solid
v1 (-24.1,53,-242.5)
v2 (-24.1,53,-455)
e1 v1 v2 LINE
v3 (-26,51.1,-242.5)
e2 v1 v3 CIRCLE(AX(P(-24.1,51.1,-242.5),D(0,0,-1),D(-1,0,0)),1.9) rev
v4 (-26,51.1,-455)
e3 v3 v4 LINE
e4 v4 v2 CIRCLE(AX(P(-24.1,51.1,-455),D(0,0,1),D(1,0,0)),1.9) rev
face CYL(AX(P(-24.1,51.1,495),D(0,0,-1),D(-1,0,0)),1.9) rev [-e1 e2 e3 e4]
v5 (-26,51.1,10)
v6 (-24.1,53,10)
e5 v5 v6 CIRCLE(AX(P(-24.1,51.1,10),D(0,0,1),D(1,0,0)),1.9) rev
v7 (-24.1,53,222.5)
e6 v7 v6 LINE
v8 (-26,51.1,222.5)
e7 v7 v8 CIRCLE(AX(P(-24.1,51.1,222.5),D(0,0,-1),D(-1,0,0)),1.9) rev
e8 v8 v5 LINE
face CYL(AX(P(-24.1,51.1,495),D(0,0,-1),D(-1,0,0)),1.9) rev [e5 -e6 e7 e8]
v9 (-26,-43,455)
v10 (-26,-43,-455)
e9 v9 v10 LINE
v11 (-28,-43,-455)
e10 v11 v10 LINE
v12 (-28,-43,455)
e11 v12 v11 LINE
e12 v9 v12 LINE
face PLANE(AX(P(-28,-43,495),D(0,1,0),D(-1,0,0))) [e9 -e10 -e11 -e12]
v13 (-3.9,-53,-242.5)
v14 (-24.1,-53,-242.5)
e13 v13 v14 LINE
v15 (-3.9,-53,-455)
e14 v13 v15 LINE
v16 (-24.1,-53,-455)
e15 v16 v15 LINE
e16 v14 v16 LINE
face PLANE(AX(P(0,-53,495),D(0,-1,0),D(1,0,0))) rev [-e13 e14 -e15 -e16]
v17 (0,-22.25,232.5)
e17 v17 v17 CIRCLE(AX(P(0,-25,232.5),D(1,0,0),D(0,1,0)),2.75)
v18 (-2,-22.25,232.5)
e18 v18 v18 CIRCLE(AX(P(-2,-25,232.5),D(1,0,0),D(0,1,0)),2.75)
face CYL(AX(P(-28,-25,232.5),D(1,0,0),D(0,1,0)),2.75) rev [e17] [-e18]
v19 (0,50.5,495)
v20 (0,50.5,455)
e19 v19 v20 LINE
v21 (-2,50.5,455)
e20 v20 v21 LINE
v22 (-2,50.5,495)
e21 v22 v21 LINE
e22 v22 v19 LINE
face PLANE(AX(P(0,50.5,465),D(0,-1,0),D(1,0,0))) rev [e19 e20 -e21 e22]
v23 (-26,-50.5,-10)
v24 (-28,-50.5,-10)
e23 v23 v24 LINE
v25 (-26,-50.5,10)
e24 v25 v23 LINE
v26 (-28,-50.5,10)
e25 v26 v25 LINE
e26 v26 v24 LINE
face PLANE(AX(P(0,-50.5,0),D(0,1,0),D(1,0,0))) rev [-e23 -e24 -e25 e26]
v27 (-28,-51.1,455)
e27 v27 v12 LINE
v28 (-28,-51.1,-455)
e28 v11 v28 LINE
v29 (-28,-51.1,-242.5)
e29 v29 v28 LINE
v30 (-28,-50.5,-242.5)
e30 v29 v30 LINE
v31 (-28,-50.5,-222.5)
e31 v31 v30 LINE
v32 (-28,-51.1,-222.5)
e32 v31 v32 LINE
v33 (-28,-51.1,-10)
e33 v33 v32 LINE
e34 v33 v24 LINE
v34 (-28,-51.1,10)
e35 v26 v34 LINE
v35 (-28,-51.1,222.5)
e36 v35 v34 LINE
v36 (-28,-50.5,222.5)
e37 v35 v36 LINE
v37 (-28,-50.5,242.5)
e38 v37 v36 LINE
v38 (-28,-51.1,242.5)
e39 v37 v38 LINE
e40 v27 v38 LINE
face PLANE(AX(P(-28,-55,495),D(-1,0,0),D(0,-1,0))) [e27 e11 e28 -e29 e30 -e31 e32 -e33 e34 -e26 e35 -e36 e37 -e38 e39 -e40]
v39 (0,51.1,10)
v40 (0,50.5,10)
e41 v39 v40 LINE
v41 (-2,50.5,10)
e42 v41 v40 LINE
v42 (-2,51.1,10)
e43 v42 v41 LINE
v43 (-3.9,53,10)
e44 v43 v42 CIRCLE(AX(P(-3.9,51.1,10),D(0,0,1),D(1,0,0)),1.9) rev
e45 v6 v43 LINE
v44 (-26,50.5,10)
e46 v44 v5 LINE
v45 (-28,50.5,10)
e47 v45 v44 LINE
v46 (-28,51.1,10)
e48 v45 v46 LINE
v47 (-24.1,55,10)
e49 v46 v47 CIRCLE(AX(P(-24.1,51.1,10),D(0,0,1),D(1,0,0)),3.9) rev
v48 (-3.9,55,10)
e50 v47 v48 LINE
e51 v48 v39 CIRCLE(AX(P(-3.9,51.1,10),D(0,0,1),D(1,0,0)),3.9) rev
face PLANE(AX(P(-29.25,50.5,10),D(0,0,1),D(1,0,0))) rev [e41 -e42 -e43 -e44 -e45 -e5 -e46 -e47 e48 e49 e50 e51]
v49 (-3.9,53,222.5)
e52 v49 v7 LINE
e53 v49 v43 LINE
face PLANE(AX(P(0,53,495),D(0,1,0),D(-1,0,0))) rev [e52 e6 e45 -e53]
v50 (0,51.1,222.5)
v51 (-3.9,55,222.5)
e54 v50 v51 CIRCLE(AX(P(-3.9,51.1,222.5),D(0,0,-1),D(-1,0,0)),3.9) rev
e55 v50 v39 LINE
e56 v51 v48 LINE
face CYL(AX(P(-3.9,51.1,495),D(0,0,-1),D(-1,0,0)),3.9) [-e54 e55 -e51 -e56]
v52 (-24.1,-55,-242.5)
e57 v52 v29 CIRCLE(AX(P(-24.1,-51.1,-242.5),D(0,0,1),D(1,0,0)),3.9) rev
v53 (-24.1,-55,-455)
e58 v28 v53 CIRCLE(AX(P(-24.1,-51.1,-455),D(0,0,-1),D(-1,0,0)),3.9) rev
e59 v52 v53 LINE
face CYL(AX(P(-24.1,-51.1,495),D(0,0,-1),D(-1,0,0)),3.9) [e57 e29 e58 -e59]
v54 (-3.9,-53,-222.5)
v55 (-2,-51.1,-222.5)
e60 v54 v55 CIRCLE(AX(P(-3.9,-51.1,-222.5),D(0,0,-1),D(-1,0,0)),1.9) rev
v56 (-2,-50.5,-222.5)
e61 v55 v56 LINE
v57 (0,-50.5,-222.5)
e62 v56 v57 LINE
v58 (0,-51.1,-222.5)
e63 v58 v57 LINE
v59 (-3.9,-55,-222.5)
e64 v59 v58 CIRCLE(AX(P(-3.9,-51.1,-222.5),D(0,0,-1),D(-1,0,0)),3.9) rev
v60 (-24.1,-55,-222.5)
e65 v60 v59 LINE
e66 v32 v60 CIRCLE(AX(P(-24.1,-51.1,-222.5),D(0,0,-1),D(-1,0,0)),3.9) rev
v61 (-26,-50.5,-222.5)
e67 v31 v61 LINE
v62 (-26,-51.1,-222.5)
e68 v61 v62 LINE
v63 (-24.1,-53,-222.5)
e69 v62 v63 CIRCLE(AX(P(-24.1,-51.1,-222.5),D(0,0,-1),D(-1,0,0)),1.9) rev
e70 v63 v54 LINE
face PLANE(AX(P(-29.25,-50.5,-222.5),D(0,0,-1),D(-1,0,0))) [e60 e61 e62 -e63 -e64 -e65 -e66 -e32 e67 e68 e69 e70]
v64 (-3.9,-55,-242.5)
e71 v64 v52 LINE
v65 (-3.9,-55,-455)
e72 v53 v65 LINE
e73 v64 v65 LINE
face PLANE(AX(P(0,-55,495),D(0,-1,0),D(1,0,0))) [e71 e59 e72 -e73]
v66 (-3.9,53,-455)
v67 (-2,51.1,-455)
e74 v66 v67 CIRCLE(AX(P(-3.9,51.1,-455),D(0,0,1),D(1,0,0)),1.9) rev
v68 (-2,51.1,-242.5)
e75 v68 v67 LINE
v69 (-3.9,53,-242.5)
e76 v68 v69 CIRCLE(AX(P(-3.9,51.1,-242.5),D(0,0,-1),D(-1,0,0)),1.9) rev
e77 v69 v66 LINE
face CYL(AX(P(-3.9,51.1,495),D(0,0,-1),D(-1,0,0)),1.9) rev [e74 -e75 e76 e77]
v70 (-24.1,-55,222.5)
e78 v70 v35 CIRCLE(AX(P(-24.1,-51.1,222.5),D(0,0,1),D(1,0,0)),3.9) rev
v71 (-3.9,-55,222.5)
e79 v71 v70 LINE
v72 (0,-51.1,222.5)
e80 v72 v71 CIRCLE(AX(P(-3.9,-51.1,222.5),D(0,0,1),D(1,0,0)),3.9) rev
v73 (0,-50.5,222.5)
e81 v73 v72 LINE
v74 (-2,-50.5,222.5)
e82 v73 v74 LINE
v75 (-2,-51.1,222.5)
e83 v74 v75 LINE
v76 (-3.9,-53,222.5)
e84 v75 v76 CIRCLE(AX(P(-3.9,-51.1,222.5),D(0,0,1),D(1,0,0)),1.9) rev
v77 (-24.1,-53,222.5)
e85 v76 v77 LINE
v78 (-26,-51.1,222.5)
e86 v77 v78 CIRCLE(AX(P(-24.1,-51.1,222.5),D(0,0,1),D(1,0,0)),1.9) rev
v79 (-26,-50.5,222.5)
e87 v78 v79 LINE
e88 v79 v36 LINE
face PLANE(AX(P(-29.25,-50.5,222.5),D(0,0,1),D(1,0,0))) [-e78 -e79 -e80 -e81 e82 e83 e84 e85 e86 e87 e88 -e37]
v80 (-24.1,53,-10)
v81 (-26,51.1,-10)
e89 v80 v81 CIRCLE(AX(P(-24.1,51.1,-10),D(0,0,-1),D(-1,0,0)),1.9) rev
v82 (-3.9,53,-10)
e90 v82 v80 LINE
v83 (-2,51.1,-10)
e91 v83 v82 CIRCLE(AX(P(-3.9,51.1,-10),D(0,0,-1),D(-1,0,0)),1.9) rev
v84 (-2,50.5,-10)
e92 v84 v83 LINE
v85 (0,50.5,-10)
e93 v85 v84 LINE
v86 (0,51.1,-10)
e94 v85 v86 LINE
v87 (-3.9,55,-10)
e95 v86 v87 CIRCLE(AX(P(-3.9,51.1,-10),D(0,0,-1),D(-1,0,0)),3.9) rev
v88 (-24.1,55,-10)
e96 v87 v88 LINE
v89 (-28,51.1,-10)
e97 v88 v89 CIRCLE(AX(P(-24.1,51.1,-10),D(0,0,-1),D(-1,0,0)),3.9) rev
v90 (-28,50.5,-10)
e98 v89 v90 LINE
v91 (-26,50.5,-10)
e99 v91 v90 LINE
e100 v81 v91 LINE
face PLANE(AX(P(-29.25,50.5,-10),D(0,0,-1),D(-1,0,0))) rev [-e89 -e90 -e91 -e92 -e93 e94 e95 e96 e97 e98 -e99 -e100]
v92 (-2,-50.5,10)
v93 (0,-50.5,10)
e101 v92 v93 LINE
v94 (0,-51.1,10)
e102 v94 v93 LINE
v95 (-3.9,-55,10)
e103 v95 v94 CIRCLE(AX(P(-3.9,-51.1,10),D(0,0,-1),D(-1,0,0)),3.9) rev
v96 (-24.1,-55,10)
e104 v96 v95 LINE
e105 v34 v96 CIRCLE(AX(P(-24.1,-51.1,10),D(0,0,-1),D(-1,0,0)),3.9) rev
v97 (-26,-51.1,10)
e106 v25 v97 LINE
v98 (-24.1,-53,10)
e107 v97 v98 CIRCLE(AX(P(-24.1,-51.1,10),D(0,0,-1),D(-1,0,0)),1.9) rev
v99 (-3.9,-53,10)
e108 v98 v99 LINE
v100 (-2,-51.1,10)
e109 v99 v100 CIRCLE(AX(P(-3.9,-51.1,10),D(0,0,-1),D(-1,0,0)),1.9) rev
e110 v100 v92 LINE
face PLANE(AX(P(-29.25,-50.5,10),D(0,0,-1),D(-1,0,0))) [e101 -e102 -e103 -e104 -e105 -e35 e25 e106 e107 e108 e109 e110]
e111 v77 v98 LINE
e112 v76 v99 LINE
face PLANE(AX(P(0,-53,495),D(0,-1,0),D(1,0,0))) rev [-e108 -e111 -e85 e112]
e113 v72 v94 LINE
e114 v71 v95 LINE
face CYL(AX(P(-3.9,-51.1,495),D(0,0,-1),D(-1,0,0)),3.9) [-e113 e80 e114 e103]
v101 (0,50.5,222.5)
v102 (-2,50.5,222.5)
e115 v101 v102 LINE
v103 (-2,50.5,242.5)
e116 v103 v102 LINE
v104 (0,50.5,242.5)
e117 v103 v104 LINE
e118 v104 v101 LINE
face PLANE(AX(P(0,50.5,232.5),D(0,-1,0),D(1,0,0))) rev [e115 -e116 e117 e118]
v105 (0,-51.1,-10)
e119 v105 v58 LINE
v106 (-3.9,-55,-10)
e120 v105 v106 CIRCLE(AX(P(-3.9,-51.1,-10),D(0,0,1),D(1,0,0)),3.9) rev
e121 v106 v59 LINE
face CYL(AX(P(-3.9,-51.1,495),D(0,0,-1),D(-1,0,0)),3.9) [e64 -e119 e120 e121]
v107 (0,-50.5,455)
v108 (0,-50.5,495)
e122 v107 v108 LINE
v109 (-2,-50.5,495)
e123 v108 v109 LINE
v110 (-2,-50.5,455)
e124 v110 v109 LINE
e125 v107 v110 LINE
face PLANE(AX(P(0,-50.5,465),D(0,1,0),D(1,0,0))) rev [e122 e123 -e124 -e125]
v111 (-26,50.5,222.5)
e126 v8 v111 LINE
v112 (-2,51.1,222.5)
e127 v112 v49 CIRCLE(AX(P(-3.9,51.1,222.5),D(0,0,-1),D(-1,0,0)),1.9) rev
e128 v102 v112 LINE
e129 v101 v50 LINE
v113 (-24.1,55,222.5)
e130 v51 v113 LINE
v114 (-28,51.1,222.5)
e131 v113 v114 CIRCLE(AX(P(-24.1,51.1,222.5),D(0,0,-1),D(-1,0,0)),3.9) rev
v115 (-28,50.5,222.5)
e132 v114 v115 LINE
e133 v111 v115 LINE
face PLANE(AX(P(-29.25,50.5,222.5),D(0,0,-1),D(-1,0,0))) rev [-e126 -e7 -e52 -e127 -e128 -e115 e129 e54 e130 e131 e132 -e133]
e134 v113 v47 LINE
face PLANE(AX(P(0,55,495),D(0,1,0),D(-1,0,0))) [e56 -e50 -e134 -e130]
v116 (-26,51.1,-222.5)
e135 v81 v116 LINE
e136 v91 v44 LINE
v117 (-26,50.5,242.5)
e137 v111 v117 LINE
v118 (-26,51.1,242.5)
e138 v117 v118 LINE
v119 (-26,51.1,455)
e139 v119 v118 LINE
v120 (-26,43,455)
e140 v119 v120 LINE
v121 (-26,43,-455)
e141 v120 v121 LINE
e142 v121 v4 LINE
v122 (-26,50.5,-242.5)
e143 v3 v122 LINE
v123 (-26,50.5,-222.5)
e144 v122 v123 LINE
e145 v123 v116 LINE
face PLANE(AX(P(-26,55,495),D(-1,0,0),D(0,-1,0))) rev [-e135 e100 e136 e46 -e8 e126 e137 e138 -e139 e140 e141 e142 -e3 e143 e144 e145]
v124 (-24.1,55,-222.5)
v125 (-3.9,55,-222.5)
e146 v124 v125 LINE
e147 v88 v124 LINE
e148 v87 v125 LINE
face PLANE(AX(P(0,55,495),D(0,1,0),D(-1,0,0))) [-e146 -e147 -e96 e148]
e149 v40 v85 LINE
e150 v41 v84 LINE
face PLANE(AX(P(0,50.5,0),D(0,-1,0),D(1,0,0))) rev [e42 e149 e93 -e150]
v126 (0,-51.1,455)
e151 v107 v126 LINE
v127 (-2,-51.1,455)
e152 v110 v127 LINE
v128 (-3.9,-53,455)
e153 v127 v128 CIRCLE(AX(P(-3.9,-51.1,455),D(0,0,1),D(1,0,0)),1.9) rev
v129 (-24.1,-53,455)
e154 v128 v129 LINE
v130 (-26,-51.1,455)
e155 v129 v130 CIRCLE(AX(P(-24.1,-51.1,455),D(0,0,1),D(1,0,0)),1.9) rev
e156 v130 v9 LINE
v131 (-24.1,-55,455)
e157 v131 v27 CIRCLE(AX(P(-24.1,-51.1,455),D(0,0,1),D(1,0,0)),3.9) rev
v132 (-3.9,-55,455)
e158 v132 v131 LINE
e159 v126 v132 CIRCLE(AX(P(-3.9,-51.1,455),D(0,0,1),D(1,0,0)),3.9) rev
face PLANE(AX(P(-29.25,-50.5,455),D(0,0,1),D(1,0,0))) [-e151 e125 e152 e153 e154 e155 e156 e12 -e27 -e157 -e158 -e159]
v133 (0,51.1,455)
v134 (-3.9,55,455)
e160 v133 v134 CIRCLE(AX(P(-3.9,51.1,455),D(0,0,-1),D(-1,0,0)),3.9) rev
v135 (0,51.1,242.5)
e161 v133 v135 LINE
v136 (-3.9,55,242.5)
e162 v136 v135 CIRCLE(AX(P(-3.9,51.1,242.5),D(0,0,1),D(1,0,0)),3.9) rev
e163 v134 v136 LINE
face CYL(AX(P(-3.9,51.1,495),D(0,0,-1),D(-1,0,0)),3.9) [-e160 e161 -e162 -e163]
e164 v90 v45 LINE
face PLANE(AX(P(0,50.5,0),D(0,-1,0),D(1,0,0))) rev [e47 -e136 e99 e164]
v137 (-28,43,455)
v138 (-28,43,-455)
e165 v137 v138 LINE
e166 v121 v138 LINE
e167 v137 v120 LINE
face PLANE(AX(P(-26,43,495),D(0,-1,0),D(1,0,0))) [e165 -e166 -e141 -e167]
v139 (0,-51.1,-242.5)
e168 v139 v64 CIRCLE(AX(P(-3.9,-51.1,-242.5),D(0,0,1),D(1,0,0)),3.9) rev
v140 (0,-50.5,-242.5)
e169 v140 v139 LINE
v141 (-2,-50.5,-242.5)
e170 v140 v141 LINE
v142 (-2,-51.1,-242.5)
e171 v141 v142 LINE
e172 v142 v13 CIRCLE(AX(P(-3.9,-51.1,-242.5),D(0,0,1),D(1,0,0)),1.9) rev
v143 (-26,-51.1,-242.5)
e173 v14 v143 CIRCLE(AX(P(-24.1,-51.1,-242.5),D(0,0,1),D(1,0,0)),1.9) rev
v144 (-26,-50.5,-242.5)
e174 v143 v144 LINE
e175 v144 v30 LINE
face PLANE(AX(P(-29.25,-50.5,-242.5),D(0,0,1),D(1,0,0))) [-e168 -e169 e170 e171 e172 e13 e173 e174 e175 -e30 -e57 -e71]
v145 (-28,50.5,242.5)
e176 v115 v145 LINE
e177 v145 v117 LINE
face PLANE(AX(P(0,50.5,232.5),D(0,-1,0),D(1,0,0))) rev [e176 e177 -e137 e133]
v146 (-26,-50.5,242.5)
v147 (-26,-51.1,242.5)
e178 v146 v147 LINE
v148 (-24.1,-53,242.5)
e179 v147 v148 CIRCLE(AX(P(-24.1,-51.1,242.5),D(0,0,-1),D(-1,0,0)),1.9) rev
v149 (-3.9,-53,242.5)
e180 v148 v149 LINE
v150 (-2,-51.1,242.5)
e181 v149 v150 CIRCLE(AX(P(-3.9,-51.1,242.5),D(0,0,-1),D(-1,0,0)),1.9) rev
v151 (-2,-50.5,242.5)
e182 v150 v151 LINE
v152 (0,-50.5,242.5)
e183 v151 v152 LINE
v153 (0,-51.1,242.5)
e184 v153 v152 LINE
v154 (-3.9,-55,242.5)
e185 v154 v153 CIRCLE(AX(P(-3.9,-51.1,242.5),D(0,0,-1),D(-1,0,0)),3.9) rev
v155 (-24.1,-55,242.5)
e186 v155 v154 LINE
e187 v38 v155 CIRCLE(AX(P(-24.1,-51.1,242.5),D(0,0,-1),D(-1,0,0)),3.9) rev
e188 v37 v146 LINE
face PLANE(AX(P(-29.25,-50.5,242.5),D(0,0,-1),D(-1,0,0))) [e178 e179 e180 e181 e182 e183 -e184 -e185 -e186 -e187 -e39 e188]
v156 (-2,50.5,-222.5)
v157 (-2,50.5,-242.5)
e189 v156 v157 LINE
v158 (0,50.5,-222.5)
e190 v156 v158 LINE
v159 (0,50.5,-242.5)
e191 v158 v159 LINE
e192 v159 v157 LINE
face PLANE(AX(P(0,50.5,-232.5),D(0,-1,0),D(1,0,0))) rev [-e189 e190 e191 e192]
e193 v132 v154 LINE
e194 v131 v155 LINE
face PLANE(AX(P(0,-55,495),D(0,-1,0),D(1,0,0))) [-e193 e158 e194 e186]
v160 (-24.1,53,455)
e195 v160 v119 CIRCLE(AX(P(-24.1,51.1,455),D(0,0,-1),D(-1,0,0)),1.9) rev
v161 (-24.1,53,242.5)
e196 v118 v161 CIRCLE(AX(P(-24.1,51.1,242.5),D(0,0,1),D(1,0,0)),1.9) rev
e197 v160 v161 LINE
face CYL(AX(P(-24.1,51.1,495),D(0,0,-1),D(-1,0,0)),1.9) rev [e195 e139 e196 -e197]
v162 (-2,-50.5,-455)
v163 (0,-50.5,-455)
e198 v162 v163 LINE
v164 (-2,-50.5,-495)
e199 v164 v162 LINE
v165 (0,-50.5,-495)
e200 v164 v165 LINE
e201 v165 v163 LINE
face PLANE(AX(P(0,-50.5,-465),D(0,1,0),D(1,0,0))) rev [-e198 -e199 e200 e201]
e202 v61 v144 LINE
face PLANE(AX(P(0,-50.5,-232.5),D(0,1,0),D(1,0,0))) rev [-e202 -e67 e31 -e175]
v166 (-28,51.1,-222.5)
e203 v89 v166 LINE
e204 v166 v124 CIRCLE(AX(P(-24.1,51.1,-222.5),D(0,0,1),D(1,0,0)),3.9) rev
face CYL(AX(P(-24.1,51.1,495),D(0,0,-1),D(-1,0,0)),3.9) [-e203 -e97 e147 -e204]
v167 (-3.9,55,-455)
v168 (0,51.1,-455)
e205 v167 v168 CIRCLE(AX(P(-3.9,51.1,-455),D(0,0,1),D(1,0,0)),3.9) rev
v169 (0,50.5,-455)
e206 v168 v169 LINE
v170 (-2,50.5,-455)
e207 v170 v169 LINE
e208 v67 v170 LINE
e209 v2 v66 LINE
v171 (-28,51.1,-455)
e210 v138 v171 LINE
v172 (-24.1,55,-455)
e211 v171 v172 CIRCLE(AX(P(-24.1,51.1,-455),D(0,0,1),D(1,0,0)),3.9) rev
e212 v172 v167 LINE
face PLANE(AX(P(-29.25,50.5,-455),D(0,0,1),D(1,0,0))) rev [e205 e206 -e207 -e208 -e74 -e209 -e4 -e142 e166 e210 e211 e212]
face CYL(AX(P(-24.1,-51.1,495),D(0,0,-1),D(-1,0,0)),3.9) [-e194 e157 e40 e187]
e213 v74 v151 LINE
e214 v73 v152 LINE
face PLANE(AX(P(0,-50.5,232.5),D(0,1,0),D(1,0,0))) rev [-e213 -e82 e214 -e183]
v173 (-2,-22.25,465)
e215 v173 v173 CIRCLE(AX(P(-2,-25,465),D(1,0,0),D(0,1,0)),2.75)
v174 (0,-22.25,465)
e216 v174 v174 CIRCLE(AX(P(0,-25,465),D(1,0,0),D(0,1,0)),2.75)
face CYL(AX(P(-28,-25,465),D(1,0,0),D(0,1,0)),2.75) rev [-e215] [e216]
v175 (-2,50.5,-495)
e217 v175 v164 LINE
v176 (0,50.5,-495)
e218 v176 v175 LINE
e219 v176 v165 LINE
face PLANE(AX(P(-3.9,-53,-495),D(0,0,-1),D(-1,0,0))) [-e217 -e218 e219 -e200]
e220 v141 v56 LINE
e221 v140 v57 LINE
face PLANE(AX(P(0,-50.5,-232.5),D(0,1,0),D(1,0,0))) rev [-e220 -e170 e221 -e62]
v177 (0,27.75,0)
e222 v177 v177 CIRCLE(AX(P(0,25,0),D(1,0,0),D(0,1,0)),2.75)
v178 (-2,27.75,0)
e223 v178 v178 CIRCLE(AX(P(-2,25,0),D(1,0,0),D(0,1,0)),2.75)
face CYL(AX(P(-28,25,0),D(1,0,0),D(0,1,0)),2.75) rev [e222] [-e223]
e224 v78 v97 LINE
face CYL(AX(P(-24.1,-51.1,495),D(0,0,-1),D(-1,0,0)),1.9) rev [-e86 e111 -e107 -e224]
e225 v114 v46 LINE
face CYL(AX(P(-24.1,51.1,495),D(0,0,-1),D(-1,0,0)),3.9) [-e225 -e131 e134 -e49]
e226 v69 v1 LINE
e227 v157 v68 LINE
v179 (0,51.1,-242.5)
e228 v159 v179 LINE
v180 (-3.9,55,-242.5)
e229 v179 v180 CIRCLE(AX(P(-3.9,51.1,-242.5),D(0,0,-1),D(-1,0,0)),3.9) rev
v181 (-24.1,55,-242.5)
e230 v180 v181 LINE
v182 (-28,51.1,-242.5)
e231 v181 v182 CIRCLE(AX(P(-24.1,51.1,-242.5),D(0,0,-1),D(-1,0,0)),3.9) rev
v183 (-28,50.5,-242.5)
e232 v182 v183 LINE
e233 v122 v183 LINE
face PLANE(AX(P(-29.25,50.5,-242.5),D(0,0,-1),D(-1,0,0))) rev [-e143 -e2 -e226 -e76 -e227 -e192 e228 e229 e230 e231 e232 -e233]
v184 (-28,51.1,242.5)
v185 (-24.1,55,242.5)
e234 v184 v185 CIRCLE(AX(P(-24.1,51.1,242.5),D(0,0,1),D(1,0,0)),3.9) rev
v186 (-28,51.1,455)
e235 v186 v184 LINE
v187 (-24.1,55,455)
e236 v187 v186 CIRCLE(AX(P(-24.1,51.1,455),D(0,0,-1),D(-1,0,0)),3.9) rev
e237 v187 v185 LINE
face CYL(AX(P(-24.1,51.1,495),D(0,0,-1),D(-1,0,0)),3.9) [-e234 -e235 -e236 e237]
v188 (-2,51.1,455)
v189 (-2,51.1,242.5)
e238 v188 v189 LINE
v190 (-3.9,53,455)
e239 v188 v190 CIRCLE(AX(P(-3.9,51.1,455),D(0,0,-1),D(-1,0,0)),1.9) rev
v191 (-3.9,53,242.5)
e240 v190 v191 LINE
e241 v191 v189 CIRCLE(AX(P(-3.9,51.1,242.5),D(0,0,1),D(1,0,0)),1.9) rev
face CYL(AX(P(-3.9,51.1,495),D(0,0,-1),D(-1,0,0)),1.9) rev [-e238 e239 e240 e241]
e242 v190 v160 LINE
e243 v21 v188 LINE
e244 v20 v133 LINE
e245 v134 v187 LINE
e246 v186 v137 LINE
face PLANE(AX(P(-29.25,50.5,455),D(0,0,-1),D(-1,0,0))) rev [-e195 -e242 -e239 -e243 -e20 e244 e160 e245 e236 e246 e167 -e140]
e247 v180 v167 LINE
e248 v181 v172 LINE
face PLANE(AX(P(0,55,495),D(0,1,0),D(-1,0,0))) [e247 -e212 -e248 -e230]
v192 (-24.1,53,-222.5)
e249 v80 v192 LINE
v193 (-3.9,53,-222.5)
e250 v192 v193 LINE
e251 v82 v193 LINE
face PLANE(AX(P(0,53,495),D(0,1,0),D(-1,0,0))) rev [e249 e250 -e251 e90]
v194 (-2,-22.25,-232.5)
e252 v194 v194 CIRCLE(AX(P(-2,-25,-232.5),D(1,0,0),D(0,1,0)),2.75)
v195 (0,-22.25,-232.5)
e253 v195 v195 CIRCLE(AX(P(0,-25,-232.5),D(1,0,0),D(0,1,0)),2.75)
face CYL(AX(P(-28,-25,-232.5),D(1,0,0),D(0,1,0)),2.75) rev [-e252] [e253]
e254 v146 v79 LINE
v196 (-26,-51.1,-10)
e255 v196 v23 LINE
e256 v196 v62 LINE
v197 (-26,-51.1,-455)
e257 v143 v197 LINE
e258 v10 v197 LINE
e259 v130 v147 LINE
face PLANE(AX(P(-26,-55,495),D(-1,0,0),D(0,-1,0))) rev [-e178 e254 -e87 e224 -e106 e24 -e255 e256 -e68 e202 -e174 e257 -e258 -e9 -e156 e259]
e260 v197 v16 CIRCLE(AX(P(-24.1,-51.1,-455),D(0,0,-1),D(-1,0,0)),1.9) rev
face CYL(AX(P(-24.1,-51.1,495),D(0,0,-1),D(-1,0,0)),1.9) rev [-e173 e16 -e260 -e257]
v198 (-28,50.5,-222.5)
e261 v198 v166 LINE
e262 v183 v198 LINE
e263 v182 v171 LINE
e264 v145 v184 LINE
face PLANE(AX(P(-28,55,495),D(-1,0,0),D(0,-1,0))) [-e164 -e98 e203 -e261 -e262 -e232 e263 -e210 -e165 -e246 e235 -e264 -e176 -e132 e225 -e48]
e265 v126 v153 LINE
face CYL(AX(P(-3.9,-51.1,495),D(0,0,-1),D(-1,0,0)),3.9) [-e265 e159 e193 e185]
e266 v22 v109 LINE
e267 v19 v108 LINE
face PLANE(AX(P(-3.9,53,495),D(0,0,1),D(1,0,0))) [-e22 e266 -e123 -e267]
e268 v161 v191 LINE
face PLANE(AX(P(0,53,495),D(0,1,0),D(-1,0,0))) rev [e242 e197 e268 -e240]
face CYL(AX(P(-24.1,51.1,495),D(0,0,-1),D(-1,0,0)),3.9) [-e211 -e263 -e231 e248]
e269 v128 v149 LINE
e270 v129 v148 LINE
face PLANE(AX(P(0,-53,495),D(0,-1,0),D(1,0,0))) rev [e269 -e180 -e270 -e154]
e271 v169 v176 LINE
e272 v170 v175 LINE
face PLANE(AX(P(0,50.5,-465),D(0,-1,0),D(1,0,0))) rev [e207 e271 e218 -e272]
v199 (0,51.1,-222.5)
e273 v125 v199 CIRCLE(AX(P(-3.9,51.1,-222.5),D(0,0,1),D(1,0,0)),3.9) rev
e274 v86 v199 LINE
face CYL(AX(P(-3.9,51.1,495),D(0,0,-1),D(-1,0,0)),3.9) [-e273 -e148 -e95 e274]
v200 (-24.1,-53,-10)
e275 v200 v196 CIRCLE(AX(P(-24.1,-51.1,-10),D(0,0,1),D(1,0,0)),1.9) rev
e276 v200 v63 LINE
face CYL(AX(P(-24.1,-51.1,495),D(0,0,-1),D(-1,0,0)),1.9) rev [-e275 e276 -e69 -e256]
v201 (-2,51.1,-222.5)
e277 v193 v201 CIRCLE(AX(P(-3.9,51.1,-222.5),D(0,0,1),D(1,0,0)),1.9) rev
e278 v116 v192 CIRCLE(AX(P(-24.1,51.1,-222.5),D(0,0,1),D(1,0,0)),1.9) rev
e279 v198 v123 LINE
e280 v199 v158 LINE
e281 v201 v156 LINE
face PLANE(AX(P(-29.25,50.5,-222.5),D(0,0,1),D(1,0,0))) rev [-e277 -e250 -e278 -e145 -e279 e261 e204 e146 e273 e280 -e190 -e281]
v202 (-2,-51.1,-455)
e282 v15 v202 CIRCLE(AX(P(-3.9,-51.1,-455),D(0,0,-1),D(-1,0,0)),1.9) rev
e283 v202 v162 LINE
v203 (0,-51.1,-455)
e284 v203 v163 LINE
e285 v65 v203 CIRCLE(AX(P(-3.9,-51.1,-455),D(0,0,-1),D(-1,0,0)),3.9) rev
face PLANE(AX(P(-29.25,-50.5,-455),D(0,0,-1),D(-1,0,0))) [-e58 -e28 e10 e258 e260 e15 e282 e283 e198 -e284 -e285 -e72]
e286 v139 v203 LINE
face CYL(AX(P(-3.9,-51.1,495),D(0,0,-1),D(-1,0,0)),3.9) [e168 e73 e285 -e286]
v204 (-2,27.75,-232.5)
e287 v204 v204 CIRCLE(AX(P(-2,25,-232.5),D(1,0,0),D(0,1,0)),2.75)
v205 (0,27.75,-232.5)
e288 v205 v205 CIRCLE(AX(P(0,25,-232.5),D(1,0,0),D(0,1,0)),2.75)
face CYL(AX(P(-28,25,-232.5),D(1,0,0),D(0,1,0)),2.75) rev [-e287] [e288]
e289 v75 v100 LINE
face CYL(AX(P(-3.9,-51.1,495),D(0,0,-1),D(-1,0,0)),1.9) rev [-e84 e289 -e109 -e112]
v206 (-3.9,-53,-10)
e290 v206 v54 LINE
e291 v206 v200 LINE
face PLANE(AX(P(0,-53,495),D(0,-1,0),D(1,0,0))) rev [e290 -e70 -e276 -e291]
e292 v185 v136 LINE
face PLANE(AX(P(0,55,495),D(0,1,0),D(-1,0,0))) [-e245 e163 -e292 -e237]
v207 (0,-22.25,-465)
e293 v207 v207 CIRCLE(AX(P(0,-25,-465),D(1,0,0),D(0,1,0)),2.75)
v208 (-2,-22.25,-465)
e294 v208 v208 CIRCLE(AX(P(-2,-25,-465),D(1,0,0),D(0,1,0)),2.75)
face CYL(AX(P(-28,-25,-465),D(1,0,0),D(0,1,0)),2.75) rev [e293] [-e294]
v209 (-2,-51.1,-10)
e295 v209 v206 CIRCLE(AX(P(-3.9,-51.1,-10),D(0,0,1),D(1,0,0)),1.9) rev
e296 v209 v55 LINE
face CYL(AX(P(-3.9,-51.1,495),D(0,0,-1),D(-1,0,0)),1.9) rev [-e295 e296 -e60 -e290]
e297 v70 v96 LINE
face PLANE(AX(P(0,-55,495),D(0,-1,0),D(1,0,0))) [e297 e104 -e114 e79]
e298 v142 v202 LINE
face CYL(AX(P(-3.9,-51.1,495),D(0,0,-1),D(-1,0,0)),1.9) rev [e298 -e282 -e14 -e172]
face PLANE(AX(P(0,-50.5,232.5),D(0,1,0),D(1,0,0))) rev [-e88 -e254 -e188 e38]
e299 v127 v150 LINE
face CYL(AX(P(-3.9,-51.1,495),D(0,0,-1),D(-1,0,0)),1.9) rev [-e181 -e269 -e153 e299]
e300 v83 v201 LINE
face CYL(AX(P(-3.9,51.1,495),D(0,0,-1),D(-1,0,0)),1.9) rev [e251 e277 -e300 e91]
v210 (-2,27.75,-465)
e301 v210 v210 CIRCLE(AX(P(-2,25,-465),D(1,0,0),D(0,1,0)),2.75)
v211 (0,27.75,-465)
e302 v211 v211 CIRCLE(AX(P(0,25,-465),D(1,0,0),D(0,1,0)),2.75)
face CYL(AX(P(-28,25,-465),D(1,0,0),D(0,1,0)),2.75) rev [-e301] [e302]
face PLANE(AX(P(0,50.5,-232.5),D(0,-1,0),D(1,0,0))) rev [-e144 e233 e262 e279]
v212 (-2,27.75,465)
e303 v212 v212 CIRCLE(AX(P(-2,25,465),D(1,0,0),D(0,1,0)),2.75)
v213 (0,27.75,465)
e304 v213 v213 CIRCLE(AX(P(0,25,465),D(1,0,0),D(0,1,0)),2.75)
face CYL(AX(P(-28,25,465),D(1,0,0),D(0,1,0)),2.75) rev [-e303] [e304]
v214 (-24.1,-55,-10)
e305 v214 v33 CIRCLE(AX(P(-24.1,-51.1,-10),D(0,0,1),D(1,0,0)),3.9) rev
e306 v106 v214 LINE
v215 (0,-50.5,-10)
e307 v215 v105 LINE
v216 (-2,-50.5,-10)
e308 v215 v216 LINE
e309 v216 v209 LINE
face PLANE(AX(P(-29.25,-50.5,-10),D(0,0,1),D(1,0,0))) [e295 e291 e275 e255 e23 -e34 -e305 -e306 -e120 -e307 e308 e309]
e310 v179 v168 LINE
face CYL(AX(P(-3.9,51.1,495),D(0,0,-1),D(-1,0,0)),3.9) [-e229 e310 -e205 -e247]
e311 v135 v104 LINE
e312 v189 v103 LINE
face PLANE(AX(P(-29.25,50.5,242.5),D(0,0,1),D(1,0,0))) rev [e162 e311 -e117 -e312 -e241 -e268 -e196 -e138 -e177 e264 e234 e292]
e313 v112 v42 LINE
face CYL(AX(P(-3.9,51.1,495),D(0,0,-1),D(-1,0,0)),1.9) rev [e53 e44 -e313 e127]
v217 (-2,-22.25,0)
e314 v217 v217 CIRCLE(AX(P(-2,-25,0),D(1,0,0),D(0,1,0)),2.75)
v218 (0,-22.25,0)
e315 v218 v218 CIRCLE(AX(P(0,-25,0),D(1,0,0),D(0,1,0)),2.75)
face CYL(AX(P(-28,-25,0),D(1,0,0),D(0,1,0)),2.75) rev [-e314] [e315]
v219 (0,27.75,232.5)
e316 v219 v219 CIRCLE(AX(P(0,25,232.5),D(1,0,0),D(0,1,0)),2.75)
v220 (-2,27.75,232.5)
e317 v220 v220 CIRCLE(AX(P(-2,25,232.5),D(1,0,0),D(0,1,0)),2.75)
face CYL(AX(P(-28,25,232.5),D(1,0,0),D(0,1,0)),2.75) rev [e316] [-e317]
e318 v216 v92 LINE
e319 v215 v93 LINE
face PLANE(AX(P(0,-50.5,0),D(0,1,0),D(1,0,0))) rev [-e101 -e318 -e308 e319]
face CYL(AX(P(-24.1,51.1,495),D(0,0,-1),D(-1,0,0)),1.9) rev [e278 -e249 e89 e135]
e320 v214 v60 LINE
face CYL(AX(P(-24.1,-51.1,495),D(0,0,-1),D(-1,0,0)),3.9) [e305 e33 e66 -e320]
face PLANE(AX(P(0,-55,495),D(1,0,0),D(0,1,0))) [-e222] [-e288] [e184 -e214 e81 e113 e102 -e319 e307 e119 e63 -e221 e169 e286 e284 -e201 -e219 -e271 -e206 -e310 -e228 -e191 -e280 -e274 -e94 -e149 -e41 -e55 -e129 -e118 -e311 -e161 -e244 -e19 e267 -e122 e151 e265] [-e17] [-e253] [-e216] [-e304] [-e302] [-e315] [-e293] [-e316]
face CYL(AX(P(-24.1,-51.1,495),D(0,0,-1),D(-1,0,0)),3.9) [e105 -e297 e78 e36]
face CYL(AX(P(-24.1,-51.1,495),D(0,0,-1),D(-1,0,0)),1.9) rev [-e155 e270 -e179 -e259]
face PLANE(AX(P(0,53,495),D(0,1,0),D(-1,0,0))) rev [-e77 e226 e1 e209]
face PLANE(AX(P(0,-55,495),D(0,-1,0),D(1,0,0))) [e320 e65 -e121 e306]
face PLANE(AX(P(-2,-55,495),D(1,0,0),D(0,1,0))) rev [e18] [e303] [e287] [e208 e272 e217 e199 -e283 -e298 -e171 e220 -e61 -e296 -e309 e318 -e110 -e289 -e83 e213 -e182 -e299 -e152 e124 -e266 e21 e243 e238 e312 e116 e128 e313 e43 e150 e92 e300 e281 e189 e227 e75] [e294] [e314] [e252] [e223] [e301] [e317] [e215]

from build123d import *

# Parameters (mm, degrees)
BASE_FLANGE1_DEPTH      = 495
SKETCH6_W               = 30.5
SKETCH6_H               = 20
CUT_EXTRUDE1_DEPTH      = 4.5
LPATTERN1_COUNT         = 3
LPATTERN1_PITCH         = 232.5
LPATTERN1_COL_COUNT     = 3
LPATTERN1_COL_PITCH     = 232.5
MIRROR1_COPY_1_SKETCH_W = 30.5
MIRROR1_COPY_1_SKETCH_H = 20
MIRROR1_COPY_1_DEPTH    = 4.5
MIRROR1_COPY_2_SKETCH_W = 30.5
MIRROR1_COPY_2_SKETCH_H = 20
MIRROR1_COPY_2_DEPTH    = 4.5
MIRROR1_COPY_3_SKETCH_W = 30.5
MIRROR1_COPY_3_SKETCH_H = 20
MIRROR1_COPY_3_DEPTH    = 4.5
MIRROR1_COPY_4_SKETCH_W = 30.5
MIRROR1_COPY_4_SKETCH_H = 20
MIRROR1_COPY_4_DEPTH    = 4.5
CUT_EXTRUDE2_START      = -26
SKETCH7_W               = 40
SKETCH7_H               = 110
CUT_EXTRUDE2_DEPTH      = 26
SKETCH8_W               = 28.862585434
SKETCH8_H               = 32.444228354
SKETCH8_W_2             = 23.227575409
SKETCH8_H_2             = 8.085236505
CUT_EXTRUDE3_DEPTH      = 4.5
CUT_EXTRUDE4_START      = -26
SKETCH9_W               = 93.672664124
SKETCH9_H               = 132.08314216
CUT_EXTRUDE4_DEPTH      = 26
SKETCH10_W              = 25.364032915
SKETCH10_H              = 10.922603619
SKETCH10_W_2            = 22.654683255
SKETCH10_H_2            = 8.37911004
CUT_EXTRUDE5_DEPTH      = 4.5
SKETCH11_R              = 2.75
CUT_EXTRUDE6_DEPTH      = 499.832637264
LPATTERN2_COUNT         = 3
LPATTERN2_PITCH         = 232.5
LPATTERN2_COL_COUNT     = 3
LPATTERN2_COL_PITCH     = 232.5


# Sheet-metal steps are written as plain solids
with BuildPart() as part:
    # Sketch1 → Base-Flange1 (new, symmetric)
    with BuildSketch(Plane.XY):
        with BuildLine():
            Line((-28, -43), (-28, -51.1))
            ThreePointArc((-28, -51.1), (-26.857716447, -53.857716447), (-24.1, -55))
            Line((-24.1, -55), (-3.9, -55))
            ThreePointArc((-3.9, -55), (-1.142283553, -53.857716447), (0, -51.1))
            Line((0, -51.1), (0, 51.1))
            ThreePointArc((0, 51.1), (-1.142283553, 53.857716447), (-3.9, 55))
            Line((-3.9, 55), (-24.1, 55))
            ThreePointArc((-24.1, 55), (-26.857716447, 53.857716447), (-28, 51.1))
            Line((-28, 51.1), (-28, 43))
            Line((-28, 43), (-26, 43))
            Line((-26, 43), (-26, 51.1))
            ThreePointArc((-26, 51.1), (-25.443502884, 52.443502884), (-24.1, 53))
            Line((-24.1, 53), (-3.9, 53))
            ThreePointArc((-3.9, 53), (-2.556497116, 52.443502884), (-2, 51.1))
            Line((-2, 51.1), (-2, -51.1))
            ThreePointArc((-2, -51.1), (-2.556497116, -52.443502884), (-3.9, -53))
            Line((-3.9, -53), (-24.1, -53))
            ThreePointArc((-24.1, -53), (-25.443502884, -52.443502884), (-26, -51.1))
            Line((-26, -51.1), (-26, -43))
            Line((-26, -43), (-28, -43))
        make_face()
    extrude(amount=BASE_FLANGE1_DEPTH, both=True)

    # Sketch6 → Cut-Extrude1 (cut)
    with BuildSketch(Plane(origin=(0, 55, 0), x_dir=(1, 0, 0), z_dir=(0, 1, 0))):
        with Locations((-14, 0)):
            Rectangle(SKETCH6_W, SKETCH6_H)
    cut_extrude1 = extrude(amount=-CUT_EXTRUDE1_DEPTH, mode=Mode.SUBTRACT)

    # LPattern1: Cut-Extrude1 ×3
    with Locations(*[(0, 0, -i * LPATTERN1_PITCH) for i in range(1, LPATTERN1_COUNT)]):
        add(cut_extrude1, mode=Mode.SUBTRACT)

    # LPattern1 col: Cut-Extrude1 ×3
    with Locations(*[(0, 0, i * LPATTERN1_COL_PITCH) for i in range(1, LPATTERN1_COL_COUNT)]):
        add(cut_extrude1, mode=Mode.SUBTRACT)

    # Mirror1: Cut-Extrude1 across plane
    add(cut_extrude1.mirror(Plane.ZX), mode=Mode.SUBTRACT)

    # Mirror1 copy 1 sketch → Mirror1 copy 1 (cut)
    with BuildSketch(Plane(origin=(0, -55, -232.5), x_dir=(1, 0, 0), z_dir=(0, -1, 0))):
        with Locations((-14, 0)):
            Rectangle(MIRROR1_COPY_1_SKETCH_W, MIRROR1_COPY_1_SKETCH_H)
    extrude(amount=-MIRROR1_COPY_1_DEPTH, mode=Mode.SUBTRACT)

    # Mirror1 copy 2 sketch → Mirror1 copy 2 (cut)
    with BuildSketch(Plane(origin=(0, -55, -465), x_dir=(1, 0, 0), z_dir=(0, -1, 0))):
        with Locations((-14, 0)):
            Rectangle(MIRROR1_COPY_2_SKETCH_W, MIRROR1_COPY_2_SKETCH_H)
    extrude(amount=-MIRROR1_COPY_2_DEPTH, mode=Mode.SUBTRACT)

    # Mirror1 copy 3 sketch → Mirror1 copy 3 (cut)
    with BuildSketch(Plane(origin=(0, -55, 232.5), x_dir=(1, 0, 0), z_dir=(0, -1, 0))):
        with Locations((-14, 0)):
            Rectangle(MIRROR1_COPY_3_SKETCH_W, MIRROR1_COPY_3_SKETCH_H)
    extrude(amount=-MIRROR1_COPY_3_DEPTH, mode=Mode.SUBTRACT)

    # Mirror1 copy 4 sketch → Mirror1 copy 4 (cut)
    with BuildSketch(Plane(origin=(0, -55, 465), x_dir=(1, 0, 0), z_dir=(0, -1, 0))):
        with Locations((-14, 0)):
            Rectangle(MIRROR1_COPY_4_SKETCH_W, MIRROR1_COPY_4_SKETCH_H)
    extrude(amount=-MIRROR1_COPY_4_DEPTH, mode=Mode.SUBTRACT)

    # Sketch7 → Cut-Extrude2 (cut)
    with BuildSketch(Plane.ZY.offset(28).offset(CUT_EXTRUDE2_START)):
        with Locations((475, 0)):
            Rectangle(SKETCH7_W, SKETCH7_H)
    extrude(amount=CUT_EXTRUDE2_DEPTH, mode=Mode.SUBTRACT)

    # Sketch8 → Cut-Extrude3 (cut)
    with BuildSketch(Plane(origin=(0, 0, 0), x_dir=(0, 0, -1), z_dir=(1, 0, 0))):
        with Locations((-489.431292717, -66.722114177)):
            Rectangle(SKETCH8_W, SKETCH8_H)
        with Locations((-486.613787705, 54.542618253)):
            Rectangle(SKETCH8_W_2, SKETCH8_H_2)
    extrude(amount=-CUT_EXTRUDE3_DEPTH, mode=Mode.SUBTRACT)

    # Sketch9 → Cut-Extrude4 (cut)
    with BuildSketch(Plane.ZY.offset(28).offset(CUT_EXTRUDE4_START)):
        with Locations((-501.836332062, -11.04157108)):
            Rectangle(SKETCH9_W, SKETCH9_H)
    extrude(amount=CUT_EXTRUDE4_DEPTH, mode=Mode.SUBTRACT)

    # Sketch10 → Cut-Extrude5 (cut)
    with BuildSketch(Plane(origin=(0, 0, 0), x_dir=(0, 0, -1), z_dir=(1, 0, 0))):
        with Locations((487.682016458, -55.96130181)):
            Rectangle(SKETCH10_W, SKETCH10_H)
        with Locations((486.327341628, 54.68955502)):
            Rectangle(SKETCH10_W_2, SKETCH10_H_2)
    extrude(amount=-CUT_EXTRUDE5_DEPTH, mode=Mode.SUBTRACT)

    # Sketch11 → Cut-Extrude6 (cut, through all)
    with BuildSketch(Plane(origin=(0, 0, 0), x_dir=(0, 0, -1), z_dir=(1, 0, 0))):
        with Locations(Location((0, -25, 0), (0, 0, 90))):
            Circle(SKETCH11_R)
        with Locations(Location((0, 25, 0), (0, 0, 90))):
            Circle(SKETCH11_R)
    cut_extrude6 = extrude(amount=-CUT_EXTRUDE6_DEPTH, mode=Mode.SUBTRACT)

    # LPattern2: Cut-Extrude6 ×3
    with Locations(*[(0, 0, -i * LPATTERN2_PITCH) for i in range(1, LPATTERN2_COUNT)]):
        add(cut_extrude6, mode=Mode.SUBTRACT)

    # LPattern2 col: Cut-Extrude6 ×3
    with Locations(*[(0, 0, i * LPATTERN2_COL_PITCH) for i in range(1, LPATTERN2_COL_COUNT)]):
        add(cut_extrude6, mode=Mode.SUBTRACT)


solid = part.part
